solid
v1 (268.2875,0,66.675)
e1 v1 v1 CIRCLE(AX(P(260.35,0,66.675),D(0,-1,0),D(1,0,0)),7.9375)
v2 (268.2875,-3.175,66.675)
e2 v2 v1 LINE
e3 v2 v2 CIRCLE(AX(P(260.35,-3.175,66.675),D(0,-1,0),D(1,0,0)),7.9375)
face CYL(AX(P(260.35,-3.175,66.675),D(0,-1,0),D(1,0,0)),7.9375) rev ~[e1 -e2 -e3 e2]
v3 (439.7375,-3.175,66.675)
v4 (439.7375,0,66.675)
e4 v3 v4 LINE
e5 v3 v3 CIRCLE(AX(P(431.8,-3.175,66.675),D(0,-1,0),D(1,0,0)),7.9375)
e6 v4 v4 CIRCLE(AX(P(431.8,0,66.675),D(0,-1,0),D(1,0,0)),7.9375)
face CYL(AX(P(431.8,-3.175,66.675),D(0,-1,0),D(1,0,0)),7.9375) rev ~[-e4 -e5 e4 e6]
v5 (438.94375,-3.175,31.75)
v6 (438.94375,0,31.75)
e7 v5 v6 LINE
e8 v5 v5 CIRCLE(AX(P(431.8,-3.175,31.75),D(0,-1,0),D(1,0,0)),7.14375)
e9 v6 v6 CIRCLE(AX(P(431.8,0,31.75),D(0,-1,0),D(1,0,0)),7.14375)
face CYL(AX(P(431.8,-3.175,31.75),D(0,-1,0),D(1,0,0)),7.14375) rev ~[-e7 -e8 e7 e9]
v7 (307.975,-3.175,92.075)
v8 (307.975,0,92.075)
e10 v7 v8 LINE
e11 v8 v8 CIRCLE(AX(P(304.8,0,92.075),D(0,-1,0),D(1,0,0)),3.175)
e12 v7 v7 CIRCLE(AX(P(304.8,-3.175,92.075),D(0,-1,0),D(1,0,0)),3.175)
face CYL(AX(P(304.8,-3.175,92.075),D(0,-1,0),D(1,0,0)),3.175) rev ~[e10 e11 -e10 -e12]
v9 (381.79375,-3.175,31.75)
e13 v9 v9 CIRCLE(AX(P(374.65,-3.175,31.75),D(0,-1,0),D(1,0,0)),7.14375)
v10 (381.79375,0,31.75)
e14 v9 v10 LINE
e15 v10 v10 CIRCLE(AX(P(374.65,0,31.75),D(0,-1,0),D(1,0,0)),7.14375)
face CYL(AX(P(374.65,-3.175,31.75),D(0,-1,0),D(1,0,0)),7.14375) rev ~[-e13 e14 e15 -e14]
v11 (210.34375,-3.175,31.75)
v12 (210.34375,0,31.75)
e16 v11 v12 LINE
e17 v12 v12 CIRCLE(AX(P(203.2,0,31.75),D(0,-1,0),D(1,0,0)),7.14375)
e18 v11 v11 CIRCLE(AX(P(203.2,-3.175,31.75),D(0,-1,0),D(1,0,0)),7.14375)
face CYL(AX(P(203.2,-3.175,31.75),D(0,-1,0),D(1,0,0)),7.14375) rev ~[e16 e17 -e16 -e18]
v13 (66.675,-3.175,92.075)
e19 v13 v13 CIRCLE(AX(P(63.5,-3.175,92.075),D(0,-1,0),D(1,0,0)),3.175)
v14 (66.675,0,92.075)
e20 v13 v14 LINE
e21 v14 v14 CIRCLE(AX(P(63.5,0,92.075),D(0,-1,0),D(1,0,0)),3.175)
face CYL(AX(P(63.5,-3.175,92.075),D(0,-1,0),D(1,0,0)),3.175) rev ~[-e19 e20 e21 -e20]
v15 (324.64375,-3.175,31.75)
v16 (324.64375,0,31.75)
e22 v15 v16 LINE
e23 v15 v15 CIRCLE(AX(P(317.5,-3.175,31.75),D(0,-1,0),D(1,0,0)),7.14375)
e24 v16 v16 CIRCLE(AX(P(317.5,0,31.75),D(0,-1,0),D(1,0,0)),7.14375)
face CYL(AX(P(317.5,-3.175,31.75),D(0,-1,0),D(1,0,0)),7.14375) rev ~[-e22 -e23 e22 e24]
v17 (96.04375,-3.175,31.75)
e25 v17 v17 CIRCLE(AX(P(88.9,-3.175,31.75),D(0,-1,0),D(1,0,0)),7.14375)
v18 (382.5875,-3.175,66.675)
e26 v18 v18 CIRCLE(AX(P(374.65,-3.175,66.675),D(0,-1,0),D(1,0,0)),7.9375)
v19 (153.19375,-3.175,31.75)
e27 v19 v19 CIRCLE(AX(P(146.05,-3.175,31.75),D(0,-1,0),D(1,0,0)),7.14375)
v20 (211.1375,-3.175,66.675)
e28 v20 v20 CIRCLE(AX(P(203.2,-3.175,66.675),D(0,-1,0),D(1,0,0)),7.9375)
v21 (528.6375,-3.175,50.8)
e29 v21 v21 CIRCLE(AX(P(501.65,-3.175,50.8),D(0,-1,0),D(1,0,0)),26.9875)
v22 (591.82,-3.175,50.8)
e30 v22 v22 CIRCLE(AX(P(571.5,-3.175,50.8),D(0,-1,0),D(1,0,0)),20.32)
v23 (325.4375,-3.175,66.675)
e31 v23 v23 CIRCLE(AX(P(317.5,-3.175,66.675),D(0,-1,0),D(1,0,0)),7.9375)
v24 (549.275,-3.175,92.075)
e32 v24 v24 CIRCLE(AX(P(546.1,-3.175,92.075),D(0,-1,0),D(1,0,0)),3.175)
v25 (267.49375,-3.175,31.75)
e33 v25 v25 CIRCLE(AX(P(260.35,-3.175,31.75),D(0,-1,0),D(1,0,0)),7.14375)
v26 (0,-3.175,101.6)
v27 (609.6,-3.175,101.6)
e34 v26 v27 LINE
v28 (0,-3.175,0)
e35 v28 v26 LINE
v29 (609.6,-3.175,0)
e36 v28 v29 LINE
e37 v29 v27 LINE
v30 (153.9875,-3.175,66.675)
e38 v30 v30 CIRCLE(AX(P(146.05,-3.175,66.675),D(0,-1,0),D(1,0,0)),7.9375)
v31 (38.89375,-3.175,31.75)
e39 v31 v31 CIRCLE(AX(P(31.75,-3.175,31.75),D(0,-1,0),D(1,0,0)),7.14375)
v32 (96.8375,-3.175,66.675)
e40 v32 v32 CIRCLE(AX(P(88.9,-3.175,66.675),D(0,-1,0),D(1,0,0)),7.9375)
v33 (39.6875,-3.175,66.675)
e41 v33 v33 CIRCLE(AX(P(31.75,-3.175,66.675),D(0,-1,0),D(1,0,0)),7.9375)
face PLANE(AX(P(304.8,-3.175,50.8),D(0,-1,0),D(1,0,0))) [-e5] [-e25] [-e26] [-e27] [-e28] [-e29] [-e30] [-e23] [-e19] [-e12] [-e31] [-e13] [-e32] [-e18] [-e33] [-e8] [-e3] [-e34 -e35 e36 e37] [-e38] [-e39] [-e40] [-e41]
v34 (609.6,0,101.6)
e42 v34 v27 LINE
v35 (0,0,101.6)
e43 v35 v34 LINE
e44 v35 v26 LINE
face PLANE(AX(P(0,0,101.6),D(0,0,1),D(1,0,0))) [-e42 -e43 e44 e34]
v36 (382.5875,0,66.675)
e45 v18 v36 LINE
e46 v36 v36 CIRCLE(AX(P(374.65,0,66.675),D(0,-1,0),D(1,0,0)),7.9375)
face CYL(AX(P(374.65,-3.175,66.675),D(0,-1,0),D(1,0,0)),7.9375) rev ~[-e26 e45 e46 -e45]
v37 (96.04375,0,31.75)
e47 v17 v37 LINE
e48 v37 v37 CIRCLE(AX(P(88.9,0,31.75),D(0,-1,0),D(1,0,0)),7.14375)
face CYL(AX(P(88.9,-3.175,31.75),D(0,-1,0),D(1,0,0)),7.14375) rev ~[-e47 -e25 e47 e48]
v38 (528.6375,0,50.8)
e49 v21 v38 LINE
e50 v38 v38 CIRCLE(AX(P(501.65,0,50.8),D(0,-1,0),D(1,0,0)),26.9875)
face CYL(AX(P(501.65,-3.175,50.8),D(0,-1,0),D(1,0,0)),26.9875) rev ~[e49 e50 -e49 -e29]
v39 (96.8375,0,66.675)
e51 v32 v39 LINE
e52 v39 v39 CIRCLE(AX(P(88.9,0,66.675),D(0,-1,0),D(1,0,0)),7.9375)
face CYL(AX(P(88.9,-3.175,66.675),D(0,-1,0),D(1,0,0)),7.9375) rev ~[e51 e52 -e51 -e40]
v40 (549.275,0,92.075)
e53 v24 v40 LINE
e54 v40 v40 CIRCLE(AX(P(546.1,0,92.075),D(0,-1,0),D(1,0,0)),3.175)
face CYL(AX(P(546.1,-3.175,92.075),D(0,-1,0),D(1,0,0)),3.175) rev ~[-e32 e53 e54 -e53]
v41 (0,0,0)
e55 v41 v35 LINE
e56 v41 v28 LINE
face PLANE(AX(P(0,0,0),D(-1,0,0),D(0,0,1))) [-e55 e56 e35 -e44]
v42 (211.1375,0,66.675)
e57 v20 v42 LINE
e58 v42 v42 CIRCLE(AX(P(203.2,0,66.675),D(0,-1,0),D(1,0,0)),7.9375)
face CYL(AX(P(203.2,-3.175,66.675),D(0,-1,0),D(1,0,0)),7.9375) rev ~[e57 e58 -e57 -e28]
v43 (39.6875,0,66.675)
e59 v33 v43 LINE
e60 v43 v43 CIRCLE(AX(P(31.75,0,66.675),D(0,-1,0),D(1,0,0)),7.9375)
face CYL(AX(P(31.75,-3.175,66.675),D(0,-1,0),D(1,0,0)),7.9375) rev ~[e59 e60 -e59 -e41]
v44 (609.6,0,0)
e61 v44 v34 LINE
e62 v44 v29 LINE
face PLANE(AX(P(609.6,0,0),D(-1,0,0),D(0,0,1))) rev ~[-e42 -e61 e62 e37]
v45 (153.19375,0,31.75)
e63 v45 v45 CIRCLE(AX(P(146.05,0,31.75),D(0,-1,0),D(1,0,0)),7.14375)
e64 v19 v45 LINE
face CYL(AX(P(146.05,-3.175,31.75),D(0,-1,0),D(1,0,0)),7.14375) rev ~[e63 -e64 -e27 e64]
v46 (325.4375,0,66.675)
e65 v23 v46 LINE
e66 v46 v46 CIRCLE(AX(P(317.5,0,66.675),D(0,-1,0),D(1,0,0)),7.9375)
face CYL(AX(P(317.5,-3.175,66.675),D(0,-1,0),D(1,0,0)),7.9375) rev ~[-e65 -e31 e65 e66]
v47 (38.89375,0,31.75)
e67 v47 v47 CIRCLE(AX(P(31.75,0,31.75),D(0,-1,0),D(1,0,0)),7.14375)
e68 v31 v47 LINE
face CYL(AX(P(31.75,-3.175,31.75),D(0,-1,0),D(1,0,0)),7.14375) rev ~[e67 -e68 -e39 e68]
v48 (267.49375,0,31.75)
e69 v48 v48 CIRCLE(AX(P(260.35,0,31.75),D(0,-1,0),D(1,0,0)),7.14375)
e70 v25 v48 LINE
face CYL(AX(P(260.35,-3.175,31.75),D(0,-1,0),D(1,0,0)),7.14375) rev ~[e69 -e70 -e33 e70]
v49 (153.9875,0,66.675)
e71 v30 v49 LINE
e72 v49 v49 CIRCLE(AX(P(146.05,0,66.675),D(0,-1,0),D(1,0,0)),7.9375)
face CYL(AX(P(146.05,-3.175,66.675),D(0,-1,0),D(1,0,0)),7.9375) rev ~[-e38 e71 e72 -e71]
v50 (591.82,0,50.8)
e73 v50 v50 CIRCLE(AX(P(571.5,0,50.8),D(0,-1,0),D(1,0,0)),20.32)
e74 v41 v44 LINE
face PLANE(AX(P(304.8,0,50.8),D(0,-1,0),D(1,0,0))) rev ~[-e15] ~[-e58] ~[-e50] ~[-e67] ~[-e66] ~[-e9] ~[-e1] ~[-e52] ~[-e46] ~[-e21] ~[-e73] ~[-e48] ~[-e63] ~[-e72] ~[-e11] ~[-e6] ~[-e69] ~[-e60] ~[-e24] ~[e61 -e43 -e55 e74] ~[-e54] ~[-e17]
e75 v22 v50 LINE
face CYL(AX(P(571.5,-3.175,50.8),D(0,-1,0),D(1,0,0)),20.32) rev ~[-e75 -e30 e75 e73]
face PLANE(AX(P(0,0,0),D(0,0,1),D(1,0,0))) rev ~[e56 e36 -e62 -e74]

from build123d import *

# Parameters (mm, degrees)
F0_W      = 609.6
F0_H      = 101.6
F1_DEPTH  = 3.175
F2_R      = 7.14375
F3_DEPTH  = 3.176
F4_R      = 26.9875
F5_DEPTH  = 3.176
F6_R      = 20.32
F7_DEPTH  = 3.176
F8_R      = 7.9375
F9_DEPTH  = 3.176
F10_R     = 3.175
F11_DEPTH = 3.176


# Not quite as in the source:
# - a feature names something its author has since deleted; it is built from what else it names


with BuildPart() as f1:
    # F0 (on Front) → F1 (new body)
    with BuildSketch(Plane.XZ):
        with Locations((304.8, 50.8)):
            Rectangle(F0_W, F0_H)
    extrude(amount=F1_DEPTH)

    # F2 (on face) → F3 (cut, through all)
    with BuildSketch(Plane.XZ.offset(3.175)):
        with Locations((31.75, 31.75)):
            Circle(F2_R)
        with Locations((88.9, 31.75)):
            Circle(F2_R)
        with Locations((146.05, 31.75)):
            Circle(F2_R)
        with Locations((203.2, 31.75)):
            Circle(F2_R)
        with Locations((260.35, 31.75)):
            Circle(F2_R)
        with Locations((317.5, 31.75)):
            Circle(F2_R)
        with Locations((374.65, 31.75)):
            Circle(F2_R)
        with Locations((431.8, 31.75)):
            Circle(F2_R)
    extrude(amount=-F3_DEPTH, mode=Mode.SUBTRACT)

    # F4 (on face) → F5 (cut, through all)
    with BuildSketch(Plane.XZ.offset(3.175)):
        with Locations((501.65, 50.8)):
            Circle(F4_R)
    extrude(amount=-F5_DEPTH, mode=Mode.SUBTRACT)

    # F6 (on face) → F7 (cut, through all)
    with BuildSketch(Plane.XZ.offset(3.175)):
        with Locations((571.5, 50.8)):
            Circle(F6_R)
    extrude(amount=-F7_DEPTH, mode=Mode.SUBTRACT)

    # F8 (on face) → F9 (cut, through all)
    with BuildSketch(Plane.XZ.offset(3.175)):
        with Locations((31.75, 66.675)):
            Circle(F8_R)
        with Locations((88.9, 66.675)):
            Circle(F8_R)
        with Locations((146.05, 66.675)):
            Circle(F8_R)
        with Locations((203.2, 66.675)):
            Circle(F8_R)
        with Locations((260.35, 66.675)):
            Circle(F8_R)
        with Locations((317.5, 66.675)):
            Circle(F8_R)
        with Locations((374.65, 66.675)):
            Circle(F8_R)
        with Locations((431.8, 66.675)):
            Circle(F8_R)
    extrude(amount=-F9_DEPTH, mode=Mode.SUBTRACT)

    # F10 (on face) → F11 (cut, through all)
    with BuildSketch(Plane.XZ.offset(3.175)):
        with Locations((63.5, 92.075)):
            Circle(F10_R)
        with Locations((304.8, 92.075)):
            Circle(F10_R)
        with Locations((546.1, 92.075)):
            Circle(F10_R)
    extrude(amount=-F11_DEPTH, mode=Mode.SUBTRACT)


solid = f1.part
